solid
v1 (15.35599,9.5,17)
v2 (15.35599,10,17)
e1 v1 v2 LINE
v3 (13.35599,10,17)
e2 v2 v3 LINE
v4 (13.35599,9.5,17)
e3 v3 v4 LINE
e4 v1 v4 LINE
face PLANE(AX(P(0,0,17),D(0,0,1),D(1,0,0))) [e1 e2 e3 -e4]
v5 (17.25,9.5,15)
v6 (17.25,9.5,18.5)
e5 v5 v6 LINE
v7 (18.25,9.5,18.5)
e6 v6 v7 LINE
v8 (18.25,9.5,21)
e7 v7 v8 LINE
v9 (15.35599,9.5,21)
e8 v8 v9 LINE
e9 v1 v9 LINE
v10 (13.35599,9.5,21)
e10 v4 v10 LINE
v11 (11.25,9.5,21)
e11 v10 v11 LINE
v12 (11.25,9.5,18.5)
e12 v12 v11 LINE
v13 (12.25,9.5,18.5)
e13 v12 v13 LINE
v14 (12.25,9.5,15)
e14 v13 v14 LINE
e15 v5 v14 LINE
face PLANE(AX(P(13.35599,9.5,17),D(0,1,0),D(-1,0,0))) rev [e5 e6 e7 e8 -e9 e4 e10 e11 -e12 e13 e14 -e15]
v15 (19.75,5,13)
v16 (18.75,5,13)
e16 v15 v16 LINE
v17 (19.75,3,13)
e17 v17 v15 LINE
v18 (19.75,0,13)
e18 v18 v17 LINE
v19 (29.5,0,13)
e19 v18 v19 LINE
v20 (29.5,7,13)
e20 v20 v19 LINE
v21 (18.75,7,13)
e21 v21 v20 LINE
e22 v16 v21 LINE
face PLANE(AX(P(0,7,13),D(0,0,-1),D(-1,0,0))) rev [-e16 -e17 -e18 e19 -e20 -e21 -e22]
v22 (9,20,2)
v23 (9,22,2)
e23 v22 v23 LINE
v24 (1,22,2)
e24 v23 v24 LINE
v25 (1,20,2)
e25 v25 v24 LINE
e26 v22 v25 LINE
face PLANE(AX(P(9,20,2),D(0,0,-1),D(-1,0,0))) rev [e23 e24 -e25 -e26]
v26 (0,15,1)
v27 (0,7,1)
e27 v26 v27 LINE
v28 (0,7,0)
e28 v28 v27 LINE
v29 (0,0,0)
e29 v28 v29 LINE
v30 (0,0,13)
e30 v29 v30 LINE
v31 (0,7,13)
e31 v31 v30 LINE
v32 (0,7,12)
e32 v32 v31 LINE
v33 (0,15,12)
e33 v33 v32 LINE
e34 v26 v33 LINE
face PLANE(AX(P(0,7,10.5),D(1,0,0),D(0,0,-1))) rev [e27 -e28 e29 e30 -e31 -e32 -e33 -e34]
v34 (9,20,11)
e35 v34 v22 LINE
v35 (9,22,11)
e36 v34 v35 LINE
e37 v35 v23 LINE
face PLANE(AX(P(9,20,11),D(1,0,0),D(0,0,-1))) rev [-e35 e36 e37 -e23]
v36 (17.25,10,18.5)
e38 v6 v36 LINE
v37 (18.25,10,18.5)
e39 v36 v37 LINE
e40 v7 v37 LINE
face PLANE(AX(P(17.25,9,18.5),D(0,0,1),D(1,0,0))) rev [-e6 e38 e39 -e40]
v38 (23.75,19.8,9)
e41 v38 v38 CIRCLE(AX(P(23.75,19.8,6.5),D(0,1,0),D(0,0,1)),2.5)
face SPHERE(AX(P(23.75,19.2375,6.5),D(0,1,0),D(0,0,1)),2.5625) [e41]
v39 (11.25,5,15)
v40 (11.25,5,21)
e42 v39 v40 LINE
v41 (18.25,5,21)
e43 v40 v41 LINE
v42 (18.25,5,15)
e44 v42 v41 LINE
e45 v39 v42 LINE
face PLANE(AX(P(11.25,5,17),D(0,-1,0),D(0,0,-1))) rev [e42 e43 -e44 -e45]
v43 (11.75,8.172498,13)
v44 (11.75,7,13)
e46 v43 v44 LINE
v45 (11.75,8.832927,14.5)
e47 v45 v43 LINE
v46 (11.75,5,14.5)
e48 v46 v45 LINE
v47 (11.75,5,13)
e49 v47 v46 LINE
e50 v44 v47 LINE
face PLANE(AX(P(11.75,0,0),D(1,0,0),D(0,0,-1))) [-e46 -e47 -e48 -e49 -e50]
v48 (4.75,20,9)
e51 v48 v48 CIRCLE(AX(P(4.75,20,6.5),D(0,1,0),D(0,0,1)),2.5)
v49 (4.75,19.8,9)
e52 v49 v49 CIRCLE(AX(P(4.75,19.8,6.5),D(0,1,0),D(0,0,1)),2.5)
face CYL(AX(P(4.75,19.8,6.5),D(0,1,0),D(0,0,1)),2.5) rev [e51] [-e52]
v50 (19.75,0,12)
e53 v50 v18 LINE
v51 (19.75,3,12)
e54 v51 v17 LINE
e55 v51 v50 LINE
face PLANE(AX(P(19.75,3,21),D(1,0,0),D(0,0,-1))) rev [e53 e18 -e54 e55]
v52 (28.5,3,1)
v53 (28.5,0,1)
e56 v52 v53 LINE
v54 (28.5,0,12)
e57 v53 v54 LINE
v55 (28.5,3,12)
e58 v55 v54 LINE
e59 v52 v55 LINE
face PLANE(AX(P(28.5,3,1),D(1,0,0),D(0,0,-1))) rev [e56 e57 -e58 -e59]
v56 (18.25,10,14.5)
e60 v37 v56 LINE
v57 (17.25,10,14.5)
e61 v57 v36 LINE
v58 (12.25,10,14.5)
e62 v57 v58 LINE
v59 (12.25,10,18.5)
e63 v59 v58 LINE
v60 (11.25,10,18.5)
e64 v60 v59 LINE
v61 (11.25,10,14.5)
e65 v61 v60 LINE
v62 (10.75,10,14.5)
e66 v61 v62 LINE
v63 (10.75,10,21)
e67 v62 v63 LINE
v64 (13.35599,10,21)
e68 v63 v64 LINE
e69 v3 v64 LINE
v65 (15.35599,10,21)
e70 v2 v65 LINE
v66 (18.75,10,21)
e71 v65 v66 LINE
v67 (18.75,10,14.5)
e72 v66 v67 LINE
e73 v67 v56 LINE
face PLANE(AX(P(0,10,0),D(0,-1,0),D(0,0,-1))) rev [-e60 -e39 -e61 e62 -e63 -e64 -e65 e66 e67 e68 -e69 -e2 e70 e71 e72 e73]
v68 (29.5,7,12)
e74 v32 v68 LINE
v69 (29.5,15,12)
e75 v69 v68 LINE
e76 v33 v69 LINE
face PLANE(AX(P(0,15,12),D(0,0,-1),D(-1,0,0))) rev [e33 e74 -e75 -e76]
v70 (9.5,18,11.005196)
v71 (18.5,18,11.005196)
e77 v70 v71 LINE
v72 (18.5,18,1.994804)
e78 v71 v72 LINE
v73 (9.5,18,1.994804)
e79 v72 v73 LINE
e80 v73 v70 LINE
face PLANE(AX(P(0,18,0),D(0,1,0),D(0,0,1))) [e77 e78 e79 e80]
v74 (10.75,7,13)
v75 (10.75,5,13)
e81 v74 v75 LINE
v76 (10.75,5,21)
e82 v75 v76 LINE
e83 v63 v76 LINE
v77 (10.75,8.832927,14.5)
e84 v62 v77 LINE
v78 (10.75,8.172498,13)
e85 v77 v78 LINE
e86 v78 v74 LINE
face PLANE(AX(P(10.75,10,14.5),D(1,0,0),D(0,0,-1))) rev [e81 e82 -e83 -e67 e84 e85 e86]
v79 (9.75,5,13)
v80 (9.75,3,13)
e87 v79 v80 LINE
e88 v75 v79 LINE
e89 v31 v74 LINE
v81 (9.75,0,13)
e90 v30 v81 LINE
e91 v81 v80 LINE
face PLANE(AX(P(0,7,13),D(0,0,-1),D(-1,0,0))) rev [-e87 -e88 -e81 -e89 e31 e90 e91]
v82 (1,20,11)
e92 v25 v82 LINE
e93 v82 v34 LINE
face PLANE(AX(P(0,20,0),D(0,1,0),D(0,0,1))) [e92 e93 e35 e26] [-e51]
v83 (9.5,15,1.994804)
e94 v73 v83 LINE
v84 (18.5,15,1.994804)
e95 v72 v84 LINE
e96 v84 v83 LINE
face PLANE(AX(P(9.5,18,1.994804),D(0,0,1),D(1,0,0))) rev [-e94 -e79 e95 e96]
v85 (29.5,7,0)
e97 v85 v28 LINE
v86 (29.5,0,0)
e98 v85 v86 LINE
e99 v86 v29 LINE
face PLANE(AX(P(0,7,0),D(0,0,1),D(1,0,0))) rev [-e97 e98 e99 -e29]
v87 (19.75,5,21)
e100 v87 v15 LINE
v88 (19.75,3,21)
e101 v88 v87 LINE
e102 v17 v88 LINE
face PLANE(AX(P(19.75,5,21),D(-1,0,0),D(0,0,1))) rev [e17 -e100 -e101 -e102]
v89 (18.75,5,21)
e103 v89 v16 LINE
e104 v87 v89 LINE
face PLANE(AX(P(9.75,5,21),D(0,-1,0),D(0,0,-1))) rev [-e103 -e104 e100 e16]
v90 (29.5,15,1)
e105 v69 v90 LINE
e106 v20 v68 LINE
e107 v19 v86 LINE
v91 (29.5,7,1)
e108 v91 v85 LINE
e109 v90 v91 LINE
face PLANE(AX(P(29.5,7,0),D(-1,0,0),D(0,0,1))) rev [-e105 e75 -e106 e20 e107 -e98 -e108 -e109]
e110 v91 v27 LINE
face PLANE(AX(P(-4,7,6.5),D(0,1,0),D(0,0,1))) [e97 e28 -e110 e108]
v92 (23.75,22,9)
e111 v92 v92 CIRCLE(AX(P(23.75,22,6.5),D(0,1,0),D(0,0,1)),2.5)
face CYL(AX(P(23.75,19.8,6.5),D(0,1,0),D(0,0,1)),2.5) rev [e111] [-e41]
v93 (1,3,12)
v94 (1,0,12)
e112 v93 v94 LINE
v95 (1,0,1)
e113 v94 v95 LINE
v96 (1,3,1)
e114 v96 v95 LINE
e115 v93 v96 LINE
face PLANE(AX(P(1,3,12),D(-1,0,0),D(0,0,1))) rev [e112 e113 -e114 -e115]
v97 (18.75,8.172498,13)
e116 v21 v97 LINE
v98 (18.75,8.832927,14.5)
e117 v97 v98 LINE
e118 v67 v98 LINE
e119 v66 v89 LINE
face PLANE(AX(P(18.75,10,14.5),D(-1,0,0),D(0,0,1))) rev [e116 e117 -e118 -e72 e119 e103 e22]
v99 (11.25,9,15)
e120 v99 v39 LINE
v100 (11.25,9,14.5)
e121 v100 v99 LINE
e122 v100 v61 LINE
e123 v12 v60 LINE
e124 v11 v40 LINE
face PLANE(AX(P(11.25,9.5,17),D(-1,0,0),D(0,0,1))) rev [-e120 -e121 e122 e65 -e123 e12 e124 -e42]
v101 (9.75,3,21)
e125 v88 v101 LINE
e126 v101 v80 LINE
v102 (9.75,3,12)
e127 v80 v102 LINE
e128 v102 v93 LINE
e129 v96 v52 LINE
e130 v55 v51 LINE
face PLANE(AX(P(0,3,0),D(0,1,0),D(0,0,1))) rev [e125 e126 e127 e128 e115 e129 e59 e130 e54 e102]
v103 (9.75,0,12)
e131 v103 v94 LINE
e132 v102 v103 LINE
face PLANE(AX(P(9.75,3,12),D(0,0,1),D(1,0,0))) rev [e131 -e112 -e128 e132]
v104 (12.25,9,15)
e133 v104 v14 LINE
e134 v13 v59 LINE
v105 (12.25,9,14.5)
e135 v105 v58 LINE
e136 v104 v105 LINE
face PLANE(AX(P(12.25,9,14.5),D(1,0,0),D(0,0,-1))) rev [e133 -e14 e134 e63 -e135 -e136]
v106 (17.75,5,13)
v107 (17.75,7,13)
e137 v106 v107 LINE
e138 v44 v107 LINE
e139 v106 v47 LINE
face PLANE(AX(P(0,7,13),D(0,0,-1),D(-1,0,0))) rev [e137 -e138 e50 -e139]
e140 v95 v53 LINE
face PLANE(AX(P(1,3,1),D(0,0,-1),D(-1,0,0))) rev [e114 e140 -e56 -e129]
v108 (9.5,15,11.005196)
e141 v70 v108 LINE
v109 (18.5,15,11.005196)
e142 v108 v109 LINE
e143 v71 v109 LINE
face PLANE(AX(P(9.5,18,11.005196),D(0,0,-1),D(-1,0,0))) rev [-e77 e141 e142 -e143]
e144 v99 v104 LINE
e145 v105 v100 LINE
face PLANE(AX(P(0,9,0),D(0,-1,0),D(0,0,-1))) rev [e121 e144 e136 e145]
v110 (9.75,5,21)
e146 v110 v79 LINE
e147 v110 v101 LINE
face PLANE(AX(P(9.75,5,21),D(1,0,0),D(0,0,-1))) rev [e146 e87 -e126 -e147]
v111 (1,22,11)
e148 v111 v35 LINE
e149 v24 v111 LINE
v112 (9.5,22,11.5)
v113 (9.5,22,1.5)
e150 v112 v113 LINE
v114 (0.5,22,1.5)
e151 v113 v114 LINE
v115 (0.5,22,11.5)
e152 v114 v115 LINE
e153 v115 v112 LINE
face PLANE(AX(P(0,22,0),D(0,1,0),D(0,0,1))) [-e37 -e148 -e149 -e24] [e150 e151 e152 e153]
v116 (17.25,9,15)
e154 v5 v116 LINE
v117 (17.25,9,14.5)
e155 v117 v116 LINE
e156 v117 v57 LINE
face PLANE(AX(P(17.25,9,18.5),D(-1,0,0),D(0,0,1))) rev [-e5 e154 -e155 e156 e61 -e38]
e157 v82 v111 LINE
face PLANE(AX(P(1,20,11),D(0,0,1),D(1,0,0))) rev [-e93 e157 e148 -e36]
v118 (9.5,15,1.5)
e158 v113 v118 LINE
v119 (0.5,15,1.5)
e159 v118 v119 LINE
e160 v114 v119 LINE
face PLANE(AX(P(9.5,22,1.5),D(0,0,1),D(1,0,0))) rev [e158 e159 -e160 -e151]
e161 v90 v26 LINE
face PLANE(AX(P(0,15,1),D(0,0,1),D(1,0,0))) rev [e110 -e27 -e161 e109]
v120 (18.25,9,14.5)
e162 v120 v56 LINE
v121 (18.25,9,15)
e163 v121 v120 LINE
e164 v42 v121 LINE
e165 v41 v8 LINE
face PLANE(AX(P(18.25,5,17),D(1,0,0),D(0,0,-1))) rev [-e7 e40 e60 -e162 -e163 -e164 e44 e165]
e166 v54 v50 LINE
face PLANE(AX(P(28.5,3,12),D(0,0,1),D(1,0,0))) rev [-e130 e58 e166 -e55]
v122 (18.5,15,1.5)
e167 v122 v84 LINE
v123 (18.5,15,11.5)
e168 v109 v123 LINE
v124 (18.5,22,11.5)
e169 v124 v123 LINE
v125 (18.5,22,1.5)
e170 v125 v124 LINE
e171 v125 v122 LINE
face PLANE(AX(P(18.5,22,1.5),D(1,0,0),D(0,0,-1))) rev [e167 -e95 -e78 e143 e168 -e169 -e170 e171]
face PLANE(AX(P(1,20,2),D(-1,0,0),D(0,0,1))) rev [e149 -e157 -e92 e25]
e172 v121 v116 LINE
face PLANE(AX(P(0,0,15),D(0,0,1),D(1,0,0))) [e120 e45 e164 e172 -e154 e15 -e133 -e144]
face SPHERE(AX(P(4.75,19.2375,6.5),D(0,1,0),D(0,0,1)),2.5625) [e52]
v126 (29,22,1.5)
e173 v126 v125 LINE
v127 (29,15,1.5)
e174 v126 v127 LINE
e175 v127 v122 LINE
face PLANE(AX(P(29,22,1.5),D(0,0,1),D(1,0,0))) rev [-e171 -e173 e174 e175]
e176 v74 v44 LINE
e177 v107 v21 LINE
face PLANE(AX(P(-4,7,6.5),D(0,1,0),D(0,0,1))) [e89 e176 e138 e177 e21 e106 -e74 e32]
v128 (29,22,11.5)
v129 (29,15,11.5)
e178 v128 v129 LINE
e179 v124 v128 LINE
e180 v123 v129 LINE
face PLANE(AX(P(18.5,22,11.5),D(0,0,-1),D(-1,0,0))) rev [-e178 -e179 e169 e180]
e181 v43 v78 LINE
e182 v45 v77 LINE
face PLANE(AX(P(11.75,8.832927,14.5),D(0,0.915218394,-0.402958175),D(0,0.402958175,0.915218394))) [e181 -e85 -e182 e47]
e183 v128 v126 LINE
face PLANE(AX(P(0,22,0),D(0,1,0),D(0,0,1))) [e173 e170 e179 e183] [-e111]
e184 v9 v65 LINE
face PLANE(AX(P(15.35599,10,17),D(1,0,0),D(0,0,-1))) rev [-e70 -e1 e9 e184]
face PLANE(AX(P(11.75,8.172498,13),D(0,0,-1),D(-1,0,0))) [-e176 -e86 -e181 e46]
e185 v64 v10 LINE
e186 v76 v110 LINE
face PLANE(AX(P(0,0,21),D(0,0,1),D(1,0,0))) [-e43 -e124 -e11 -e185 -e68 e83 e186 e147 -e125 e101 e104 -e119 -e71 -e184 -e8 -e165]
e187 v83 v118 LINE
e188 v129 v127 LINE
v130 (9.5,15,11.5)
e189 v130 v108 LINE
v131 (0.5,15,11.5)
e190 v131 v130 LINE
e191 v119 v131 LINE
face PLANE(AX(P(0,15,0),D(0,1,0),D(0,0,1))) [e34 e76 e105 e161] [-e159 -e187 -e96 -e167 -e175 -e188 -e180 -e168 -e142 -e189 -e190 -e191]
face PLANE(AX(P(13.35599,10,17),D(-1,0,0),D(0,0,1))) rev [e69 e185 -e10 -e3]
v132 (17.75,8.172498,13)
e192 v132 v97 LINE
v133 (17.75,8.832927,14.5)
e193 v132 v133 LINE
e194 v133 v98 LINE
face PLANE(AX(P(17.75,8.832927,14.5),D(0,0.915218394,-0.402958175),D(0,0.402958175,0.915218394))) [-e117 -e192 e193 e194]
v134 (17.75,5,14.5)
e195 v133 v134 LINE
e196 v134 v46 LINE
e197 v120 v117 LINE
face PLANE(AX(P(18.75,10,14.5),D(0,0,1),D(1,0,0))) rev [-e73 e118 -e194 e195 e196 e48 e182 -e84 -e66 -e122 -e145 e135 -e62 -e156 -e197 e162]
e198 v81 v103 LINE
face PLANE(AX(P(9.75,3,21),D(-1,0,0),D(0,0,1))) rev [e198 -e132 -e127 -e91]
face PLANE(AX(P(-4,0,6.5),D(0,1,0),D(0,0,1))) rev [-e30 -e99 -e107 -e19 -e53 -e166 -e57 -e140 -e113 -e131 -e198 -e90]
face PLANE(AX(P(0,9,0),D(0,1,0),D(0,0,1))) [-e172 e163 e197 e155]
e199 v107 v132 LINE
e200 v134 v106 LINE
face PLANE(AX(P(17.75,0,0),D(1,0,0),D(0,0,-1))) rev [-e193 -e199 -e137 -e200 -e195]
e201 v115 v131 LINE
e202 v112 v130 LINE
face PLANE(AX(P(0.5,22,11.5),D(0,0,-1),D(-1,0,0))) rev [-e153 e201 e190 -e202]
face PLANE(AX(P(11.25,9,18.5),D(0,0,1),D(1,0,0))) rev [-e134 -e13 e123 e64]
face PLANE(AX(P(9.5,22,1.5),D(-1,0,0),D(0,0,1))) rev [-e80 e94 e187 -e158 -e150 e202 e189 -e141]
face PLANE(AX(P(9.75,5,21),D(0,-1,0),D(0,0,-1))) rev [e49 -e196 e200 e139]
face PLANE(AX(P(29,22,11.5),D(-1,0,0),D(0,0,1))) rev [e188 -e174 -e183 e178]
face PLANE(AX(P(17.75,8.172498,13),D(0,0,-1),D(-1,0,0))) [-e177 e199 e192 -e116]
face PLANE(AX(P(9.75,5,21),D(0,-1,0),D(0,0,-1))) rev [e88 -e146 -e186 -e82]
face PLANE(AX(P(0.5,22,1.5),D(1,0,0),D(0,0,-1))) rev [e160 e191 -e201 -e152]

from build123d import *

# Parameters (mm, degrees)
EXTRUDE_1_DEPTH          = 7
CUT_EXTRUDE_START        = -5
SKETCH_2_R               = 4
CUT_EXTRUDE_1_DEPTH      = 5
SKETCH_3_W               = 29.5
SKETCH_3_H               = 11
EXTRUDE_2_DEPTH          = 8
SKETCH_4_W               = 10.5
SKETCH_4_H               = 10
SKETCH_4_W_2             = 9
EXTRUDE_3_DEPTH          = 7
SKETCH_5_W               = 8
SKETCH_5_H               = 9
CUT_EXTRUDE_2_DEPTH      = 2
SKETCH_6_R               = 2.5
CUT_EXTRUDE_3_DEPTH      = 2.2
SKETCH_7_R               = 1.6
CUT_EXTRUDE_4_DEPTH      = 45.443784717
SKETCH_8_W               = 10
SKETCH_8_H               = 5
EXTRUDE_4_DEPTH          = 8
CUT_EXTRUDE_5_DEPTH      = 3
SKETCH_11_W              = 8
SKETCH_11_H              = 6.5
EXTRUDE_6_DEPTH          = 5
EXTRUDE_7_DEPTH          = 1
EXTRUDE_8_DEPTH          = 1
CUT_EXTRUDE_6_DEPTH      = 4
SKETCH_15_W              = 7
SKETCH_15_H              = 4.5
CUT_EXTRUDE_7_DEPTH      = 2
SKETCH_16_W              = 1
SKETCH_16_H              = 4
CUT_EXTRUDE_8_DEPTH      = 1
CUT_EXTRUDE_9_DEPTH      = 46.521972716
CUT_EXTRUDE_9_DEPTH_BACK = 46.521972716
SKETCH_17_W              = 8.500817713
SKETCH_17_H              = 8.67771192
SKETCH_17_W_2            = 8.381247082
SKETCH_17_H_2            = 10.001242217
SKETCH_18_W              = 9
SKETCH_18_H              = 9.010392854
EXTRUDE_9_DEPTH          = 3


# Read off the part's stored shape, not the designer's step: 圆顶1, 圆顶2
with BuildPart() as part:
    # 草图1 → 凸台-拉伸1 (new body)
    with BuildSketch(Plane(origin=(0, 0, 0), x_dir=(1, 0, 0), z_dir=(0, 1, 0))):
        with BuildLine():
            Line((0, 0), (29.5, 0))
            Line((29.5, 0), (29.5, -2.5))
            Line((29.5, -2.5), (33.5, -2.5))
            ThreePointArc((33.5, -2.5), (37.5, -6.5), (33.5, -10.5))
            Line((33.5, -10.5), (29.5, -10.5))
            Line((29.5, -10.5), (29.5, -13))
            Line((29.5, -13), (0, -13))
            Line((0, -13), (0, -10.5))
            Line((0, -10.5), (-4, -10.5))
            ThreePointArc((-4, -10.5), (-8, -6.5), (-4, -2.5))
            Line((-4, -2.5), (0, -2.5))
            Line((0, -2.5), (0, 0))
        make_face()
    extrude(amount=EXTRUDE_1_DEPTH)

    # 草图2 → 切除-拉伸1 (cut)
    with BuildSketch(Plane(origin=(0, 7, 0), x_dir=(1, 0, 0), z_dir=(0, 1, 0)).offset(CUT_EXTRUDE_START)):
        with Locations((-4, -6.5)):
            Circle(SKETCH_2_R)
        with Locations((33.5, -6.5)):
            Circle(SKETCH_2_R)
    extrude(amount=CUT_EXTRUDE_1_DEPTH, mode=Mode.SUBTRACT)

    # 草图3 → 凸台-拉伸2 (add)
    with BuildSketch(Plane(origin=(0, 7, 0), x_dir=(1, 0, 0), z_dir=(0, 1, 0))):
        with Locations((14.75, -6.5)):
            Rectangle(SKETCH_3_W, SKETCH_3_H)
    extrude(amount=EXTRUDE_2_DEPTH)

    # 草图4 → 凸台-拉伸3 (add)
    with BuildSketch(Plane(origin=(0, 15, 0), x_dir=(1, 0, 0), z_dir=(0, 1, 0))):
        with Locations((23.75, -6.5)):
            Rectangle(SKETCH_4_W, SKETCH_4_H)
        with Locations((5, -6.5)):
            Rectangle(SKETCH_4_W_2, SKETCH_4_H)
    extrude(amount=EXTRUDE_3_DEPTH)

    # 草图5 → 切除-拉伸2 (cut)
    with BuildSketch(Plane(origin=(0, 22, 0), x_dir=(1, 0, 0), z_dir=(0, 1, 0))):
        with Locations((5, -6.5)):
            Rectangle(SKETCH_5_W, SKETCH_5_H)
    extrude(amount=-CUT_EXTRUDE_2_DEPTH, mode=Mode.SUBTRACT)

    # 草图6 → 切除-拉伸3 (cut)
    with BuildSketch(Plane(origin=(0, 22, 0), x_dir=(1, 0, 0), z_dir=(0, 1, 0))):
        with Locations(Location((23.75, -6.5, 0), (0, 0, 270))):
            Circle(SKETCH_6_R)
        with Locations(Location((4.75, -6.5, 0), (0, 0, 270))):
            Circle(SKETCH_6_R)
    extrude(amount=-CUT_EXTRUDE_3_DEPTH, mode=Mode.SUBTRACT)

    # 圆顶1 outline → 圆顶1 (revolve)
    with BuildSketch(Plane(origin=(4.75, 0, 6.5), x_dir=(1, 0, 0), z_dir=(0, 0, 1))):
        with BuildLine():
            Line((0, 19.8), (2.500000001, 19.799999998))
            ThreePointArc((2.500000001, 19.799999998), (1.60078106, 21.238476323), (0, 21.8))
            Line((0, 21.8), (0, 19.8))
        make_face()
    revolve(axis=Axis((4.75, 0, 6.5), (0, 1, 0)))

    # 圆顶2 outline → 圆顶2 (revolve)
    with BuildSketch(Plane(origin=(23.75, 0, 6.5), x_dir=(1, 0, 0), z_dir=(0, 0, 1))):
        with BuildLine():
            Line((0, 19.8), (2.500000001, 19.799999997))
            ThreePointArc((2.500000001, 19.799999997), (1.60078106, 21.238476323), (0, 21.8))
            Line((0, 21.8), (0, 19.8))
        make_face()
    revolve(axis=Axis((23.75, 0, 6.5), (0, 1, 0)))

    # 草图7 → 切除-拉伸4 (cut, through all)
    with BuildSketch(Plane(origin=(0, 2, 0), x_dir=(1, 0, 0), z_dir=(0, 1, 0))):
        with Locations(Location((-4, -6.5, 0), (0, 0, 270))):
            Circle(SKETCH_7_R)
        with Locations(Location((33.5, -6.5, 0), (0, 0, 270))):
            Circle(SKETCH_7_R)
    extrude(amount=-CUT_EXTRUDE_4_DEPTH, mode=Mode.SUBTRACT)

    # 草图8 → 凸台-拉伸4 (add)
    with BuildSketch(Plane.XY.offset(13)):
        with Locations((14.75, 2.5)):
            Rectangle(SKETCH_8_W, SKETCH_8_H)
    extrude(amount=EXTRUDE_4_DEPTH)

    # 草图10 → 切除-拉伸5 (cut)
    with BuildSketch(Plane.XZ):
        Polygon((9.75, 21), (9.75, 12), (1, 12), (1, 1), (28.5, 1), (28.5, 12), (19.75, 12), (19.75, 21), align=None)
    extrude(amount=-CUT_EXTRUDE_5_DEPTH, mode=Mode.SUBTRACT)

    # 草图11 → 凸台-拉伸6 (add)
    with BuildSketch(Plane(origin=(0, 5, 0), x_dir=(1, 0, 0), z_dir=(0, 1, 0))):
        with Locations((14.75, -17.75)):
            Rectangle(SKETCH_11_W, SKETCH_11_H)
    extrude(amount=EXTRUDE_6_DEPTH)

    # 草图12 → 凸台-拉伸7 (add)
    with BuildSketch(Plane(origin=(18.75, 0, 0), x_dir=(0, 0, -1), z_dir=(1, 0, 0))):
        Polygon((-14.5, 8.832927064), (-13, 8.172497524), (-13, 5), (-14.5, 5), align=None)
    extrude(amount=-EXTRUDE_7_DEPTH)

    # 草图13 → 凸台-拉伸8 (add)
    with BuildSketch(Plane.ZY.offset(-10.75)):
        Polygon((14.5, 8.832927064), (13, 8.172497524), (13, 5), (14.5, 5), align=None)
    extrude(amount=-EXTRUDE_8_DEPTH)

    # 草图14 → 切除-拉伸6 (cut)
    with BuildSketch(Plane.XY.offset(21)):
        Polygon((11.25, 5), (18.25, 5), (18.25, 9.5), (15.355989936, 9.5), (15.355989936, 10), (13.355989936, 10), (13.355989936, 9.5), (11.25, 9.5), align=None)
    extrude(amount=-CUT_EXTRUDE_6_DEPTH, mode=Mode.SUBTRACT)

    # 草图15 → 切除-拉伸7 (cut)
    with BuildSketch(Plane.XY.offset(17)):
        with Locations((14.75, 7.25)):
            Rectangle(SKETCH_15_W, SKETCH_15_H)
    extrude(amount=-CUT_EXTRUDE_7_DEPTH, mode=Mode.SUBTRACT)

    # 草图16 → 切除-拉伸8 (cut)
    with BuildSketch(Plane(origin=(0, 10, 0), x_dir=(1, 0, 0), z_dir=(0, 1, 0))):
        with Locations((11.75, -16.5)):
            Rectangle(SKETCH_16_W, SKETCH_16_H)
        with Locations((17.75, -16.5)):
            Rectangle(SKETCH_16_W, SKETCH_16_H)
    extrude(amount=-CUT_EXTRUDE_8_DEPTH, mode=Mode.SUBTRACT)

    # 草图17 → 切除-拉伸9 (cut, two sides: drawn at the far end of the back side and taken through both)
    with BuildSketch(Plane(origin=(0, 15, 0), x_dir=(1, 0, 0), z_dir=(0, 1, 0)).offset(-CUT_EXTRUDE_9_DEPTH_BACK)):
        with Locations((33.750408857, -6.83885596)):
            Rectangle(SKETCH_17_W, SKETCH_17_H)
        with Locations((-4.190623541, -7.500621109)):
            Rectangle(SKETCH_17_W_2, SKETCH_17_H_2)
    extrude(amount=CUT_EXTRUDE_9_DEPTH + CUT_EXTRUDE_9_DEPTH_BACK, mode=Mode.SUBTRACT)

    # 草图18 → 凸台-拉伸9 (add)
    with BuildSketch(Plane(origin=(0, 15, 0), x_dir=(1, 0, 0), z_dir=(0, 1, 0))):
        with Locations((14, -6.5)):
            Rectangle(SKETCH_18_W, SKETCH_18_H)
    extrude(amount=EXTRUDE_9_DEPTH)


solid = part.part
